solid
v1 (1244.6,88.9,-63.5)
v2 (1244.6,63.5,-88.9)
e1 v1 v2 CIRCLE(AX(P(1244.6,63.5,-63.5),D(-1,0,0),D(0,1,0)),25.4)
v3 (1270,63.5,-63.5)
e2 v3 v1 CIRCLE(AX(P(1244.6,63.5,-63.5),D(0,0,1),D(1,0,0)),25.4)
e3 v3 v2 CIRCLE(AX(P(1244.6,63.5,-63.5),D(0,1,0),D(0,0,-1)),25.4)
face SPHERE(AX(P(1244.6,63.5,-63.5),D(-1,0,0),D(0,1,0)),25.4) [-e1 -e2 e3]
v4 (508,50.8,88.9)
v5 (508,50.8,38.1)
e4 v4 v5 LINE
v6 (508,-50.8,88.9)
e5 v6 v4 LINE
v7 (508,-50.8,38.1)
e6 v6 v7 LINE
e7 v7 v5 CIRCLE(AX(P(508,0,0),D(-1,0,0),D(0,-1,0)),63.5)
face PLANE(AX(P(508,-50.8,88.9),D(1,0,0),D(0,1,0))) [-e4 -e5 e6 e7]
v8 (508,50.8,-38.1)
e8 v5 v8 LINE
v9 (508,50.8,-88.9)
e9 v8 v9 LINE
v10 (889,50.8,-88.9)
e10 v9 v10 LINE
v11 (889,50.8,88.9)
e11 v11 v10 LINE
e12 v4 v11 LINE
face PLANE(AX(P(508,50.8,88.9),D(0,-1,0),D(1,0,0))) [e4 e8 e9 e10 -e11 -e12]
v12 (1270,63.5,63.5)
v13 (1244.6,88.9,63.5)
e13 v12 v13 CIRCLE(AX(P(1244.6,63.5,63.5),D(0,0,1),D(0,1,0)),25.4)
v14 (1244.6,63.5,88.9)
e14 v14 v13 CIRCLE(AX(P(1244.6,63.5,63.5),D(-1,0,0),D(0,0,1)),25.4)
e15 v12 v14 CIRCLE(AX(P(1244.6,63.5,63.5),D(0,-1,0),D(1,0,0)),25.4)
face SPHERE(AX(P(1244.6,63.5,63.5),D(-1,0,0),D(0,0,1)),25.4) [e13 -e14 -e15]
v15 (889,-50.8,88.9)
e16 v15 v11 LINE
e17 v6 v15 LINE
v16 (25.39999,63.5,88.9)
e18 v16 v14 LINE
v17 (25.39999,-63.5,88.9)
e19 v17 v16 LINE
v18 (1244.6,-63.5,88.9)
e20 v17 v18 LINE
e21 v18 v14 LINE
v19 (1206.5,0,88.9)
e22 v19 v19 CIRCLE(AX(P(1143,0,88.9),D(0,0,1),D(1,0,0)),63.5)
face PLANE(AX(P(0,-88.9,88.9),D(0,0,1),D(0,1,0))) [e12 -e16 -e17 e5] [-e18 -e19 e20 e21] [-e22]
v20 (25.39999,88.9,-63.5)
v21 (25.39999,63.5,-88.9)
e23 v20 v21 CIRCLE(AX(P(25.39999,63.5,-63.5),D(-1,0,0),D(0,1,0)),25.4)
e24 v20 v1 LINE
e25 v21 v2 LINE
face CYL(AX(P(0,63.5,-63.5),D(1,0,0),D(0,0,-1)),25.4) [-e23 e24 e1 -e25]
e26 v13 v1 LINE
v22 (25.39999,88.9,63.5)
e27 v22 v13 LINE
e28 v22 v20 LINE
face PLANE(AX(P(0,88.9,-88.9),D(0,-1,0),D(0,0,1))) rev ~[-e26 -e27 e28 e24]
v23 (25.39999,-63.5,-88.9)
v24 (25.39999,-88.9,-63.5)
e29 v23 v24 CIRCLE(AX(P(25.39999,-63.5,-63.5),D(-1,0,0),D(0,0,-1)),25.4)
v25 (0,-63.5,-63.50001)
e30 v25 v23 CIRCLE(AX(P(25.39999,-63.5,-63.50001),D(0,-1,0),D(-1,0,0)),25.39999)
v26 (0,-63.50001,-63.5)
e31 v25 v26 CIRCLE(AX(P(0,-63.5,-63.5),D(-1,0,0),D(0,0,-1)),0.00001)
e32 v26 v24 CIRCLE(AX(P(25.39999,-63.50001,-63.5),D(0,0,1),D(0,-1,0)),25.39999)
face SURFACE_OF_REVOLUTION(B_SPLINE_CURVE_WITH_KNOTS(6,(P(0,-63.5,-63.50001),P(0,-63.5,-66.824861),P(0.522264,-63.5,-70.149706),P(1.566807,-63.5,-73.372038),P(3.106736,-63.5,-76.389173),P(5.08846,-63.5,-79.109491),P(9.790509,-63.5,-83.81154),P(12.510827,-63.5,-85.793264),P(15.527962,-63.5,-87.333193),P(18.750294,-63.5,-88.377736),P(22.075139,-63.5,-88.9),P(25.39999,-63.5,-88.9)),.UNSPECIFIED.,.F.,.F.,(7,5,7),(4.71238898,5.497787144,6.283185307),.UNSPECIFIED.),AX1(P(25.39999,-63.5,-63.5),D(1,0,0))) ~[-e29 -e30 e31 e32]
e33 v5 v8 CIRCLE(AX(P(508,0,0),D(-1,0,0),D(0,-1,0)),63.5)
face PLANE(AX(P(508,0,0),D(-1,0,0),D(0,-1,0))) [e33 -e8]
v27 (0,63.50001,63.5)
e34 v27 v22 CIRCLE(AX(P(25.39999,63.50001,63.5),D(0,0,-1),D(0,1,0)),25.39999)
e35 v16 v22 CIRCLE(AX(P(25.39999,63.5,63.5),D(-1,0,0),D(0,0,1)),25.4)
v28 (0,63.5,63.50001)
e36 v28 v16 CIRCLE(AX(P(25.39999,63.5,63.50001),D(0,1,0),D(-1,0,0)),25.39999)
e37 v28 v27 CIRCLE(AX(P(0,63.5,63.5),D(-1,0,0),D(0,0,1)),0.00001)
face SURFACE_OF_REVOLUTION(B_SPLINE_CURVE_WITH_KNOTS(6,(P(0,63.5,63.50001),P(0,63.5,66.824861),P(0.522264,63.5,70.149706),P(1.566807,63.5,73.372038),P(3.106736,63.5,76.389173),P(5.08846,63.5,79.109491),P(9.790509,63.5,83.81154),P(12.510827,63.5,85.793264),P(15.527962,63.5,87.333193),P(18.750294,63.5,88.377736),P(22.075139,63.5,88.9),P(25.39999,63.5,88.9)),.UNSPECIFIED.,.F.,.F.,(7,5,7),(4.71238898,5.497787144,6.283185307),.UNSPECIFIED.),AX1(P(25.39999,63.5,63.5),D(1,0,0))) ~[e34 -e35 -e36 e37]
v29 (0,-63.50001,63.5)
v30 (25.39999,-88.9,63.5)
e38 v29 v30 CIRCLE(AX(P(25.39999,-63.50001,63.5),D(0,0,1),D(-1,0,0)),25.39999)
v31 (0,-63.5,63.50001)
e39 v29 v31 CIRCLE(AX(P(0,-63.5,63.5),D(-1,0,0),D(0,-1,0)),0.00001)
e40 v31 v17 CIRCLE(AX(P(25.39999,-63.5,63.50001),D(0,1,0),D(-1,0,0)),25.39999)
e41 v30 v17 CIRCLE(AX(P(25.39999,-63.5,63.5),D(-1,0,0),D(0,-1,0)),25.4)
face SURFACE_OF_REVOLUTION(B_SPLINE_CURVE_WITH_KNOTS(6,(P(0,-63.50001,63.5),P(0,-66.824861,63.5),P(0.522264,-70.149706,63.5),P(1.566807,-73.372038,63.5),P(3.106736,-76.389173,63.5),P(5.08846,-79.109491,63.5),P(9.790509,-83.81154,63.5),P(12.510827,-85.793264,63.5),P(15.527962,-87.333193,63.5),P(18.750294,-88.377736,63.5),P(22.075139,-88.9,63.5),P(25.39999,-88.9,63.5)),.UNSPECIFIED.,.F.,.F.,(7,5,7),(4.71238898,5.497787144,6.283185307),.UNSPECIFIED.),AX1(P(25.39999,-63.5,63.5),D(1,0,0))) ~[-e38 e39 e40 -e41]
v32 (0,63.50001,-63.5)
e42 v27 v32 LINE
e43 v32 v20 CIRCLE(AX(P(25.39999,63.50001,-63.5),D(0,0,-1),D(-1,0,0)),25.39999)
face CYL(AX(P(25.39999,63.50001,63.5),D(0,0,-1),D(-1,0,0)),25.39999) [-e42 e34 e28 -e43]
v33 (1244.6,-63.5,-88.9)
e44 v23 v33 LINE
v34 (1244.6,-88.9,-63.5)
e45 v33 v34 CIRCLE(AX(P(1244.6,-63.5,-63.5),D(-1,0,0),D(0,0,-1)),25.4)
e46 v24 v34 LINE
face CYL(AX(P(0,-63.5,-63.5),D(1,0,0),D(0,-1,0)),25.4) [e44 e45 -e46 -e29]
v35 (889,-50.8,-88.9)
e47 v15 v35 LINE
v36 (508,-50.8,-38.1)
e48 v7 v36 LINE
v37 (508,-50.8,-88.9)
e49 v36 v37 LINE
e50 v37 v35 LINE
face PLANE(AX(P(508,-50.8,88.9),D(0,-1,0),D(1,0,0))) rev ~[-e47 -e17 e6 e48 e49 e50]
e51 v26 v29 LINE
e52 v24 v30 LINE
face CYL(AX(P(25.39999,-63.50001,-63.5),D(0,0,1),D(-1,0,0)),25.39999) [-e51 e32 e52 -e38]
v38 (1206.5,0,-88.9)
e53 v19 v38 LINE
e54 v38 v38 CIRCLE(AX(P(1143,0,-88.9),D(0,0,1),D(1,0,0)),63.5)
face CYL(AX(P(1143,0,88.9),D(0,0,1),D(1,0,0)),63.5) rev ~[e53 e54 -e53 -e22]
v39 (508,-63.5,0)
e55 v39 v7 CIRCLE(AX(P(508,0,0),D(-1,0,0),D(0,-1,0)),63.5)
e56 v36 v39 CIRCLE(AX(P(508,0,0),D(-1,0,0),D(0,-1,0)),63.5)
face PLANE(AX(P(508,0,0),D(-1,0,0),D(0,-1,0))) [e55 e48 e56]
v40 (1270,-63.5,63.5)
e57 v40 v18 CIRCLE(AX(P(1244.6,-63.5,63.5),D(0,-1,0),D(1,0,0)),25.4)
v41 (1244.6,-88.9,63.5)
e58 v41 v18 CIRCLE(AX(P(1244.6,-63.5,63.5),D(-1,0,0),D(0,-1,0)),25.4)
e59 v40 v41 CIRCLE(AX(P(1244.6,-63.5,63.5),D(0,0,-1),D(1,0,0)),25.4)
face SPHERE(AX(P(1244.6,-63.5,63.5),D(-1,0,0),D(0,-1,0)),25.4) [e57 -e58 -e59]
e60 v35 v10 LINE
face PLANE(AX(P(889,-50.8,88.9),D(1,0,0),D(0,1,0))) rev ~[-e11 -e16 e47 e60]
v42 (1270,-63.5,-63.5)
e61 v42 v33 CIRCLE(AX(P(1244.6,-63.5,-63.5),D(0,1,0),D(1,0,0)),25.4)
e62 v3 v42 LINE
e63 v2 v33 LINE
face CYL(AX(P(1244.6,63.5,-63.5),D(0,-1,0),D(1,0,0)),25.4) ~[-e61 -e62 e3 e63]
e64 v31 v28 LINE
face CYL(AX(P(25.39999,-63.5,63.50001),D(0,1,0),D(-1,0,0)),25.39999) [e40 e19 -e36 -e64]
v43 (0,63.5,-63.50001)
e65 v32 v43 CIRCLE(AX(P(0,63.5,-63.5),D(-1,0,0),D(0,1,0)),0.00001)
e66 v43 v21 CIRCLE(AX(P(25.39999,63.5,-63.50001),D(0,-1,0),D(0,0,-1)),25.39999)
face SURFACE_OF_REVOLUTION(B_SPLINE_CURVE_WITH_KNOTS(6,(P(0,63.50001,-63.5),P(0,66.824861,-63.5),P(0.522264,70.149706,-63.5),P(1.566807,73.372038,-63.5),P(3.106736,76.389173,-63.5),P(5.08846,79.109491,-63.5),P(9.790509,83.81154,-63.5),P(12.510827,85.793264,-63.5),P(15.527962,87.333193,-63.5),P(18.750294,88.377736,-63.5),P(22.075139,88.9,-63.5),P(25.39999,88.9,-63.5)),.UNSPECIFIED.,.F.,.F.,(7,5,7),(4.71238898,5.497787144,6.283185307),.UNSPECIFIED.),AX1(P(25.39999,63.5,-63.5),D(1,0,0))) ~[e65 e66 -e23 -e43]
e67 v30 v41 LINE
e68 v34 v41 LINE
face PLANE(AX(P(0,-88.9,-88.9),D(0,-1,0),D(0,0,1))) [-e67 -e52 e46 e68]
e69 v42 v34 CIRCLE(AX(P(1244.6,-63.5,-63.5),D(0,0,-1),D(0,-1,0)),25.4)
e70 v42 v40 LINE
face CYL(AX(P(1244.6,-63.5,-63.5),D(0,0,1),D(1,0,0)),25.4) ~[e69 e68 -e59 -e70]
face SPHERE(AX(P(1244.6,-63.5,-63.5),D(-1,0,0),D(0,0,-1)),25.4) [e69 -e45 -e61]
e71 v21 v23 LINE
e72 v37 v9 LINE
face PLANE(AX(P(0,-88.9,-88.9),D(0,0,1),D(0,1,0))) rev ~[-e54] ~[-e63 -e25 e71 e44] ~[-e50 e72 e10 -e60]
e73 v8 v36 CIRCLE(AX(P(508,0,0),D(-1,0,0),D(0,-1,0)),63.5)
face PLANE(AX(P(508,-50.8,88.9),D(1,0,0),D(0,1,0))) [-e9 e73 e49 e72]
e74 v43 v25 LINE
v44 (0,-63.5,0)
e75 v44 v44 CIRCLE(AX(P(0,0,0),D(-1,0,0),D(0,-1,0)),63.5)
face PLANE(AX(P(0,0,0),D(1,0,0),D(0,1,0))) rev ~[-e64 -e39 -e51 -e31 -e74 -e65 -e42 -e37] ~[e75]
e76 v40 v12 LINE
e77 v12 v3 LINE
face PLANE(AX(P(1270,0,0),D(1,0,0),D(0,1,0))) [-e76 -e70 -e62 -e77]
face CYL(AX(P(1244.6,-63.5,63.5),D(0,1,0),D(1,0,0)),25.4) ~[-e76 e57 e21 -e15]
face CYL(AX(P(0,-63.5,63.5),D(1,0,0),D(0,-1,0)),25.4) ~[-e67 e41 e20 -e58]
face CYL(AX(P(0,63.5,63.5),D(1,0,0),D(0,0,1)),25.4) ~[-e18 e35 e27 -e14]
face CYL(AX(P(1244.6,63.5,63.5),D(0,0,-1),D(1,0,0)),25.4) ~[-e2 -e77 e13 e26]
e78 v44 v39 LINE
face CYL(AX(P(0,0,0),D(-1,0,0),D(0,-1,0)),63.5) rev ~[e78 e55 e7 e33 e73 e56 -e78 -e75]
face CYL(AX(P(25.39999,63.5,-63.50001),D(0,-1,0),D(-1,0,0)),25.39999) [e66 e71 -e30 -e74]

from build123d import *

# Parameters (mm, degrees)
F0_W     = 177.8
F0_H     = 177.8
F1_DEPTH = 1270
F2_R     = 63.5
F3_DEPTH = 177.8
F4_R     = 63.5
F5_DEPTH = 508
F6_R     = 25.4
F7_R     = 25.4
F8_W     = 381
F8_H     = 101.6
F9_DEPTH = 177.8
F10_R    = 25.39999


# Not quite as in the source:
# - a fillet or chamfer is up to 0.001 mm smaller than in the source, because OpenCascade refuses the exact size


with BuildPart() as f1:
    # F0 (on Right) → F1 (new body)
    with BuildSketch(Plane.YZ):
        Rectangle(F0_W, F0_H)
    extrude(amount=F1_DEPTH)

    # F2 (on face) → F3 (cut)
    with BuildSketch(Plane.XY.offset(88.9)):
        with Locations((1143, 0)):
            Circle(F2_R)
    extrude(amount=-F3_DEPTH, mode=Mode.SUBTRACT)

    # F4 (on face) → F5 (cut)
    with BuildSketch(Plane(origin=(0, 0, 0), x_dir=(0, -1, 0), z_dir=(-1, 0, 0))):
        Circle(F4_R)
    extrude(amount=-F5_DEPTH, mode=Mode.SUBTRACT)

    # F6
    f6_edges = [f1.edges().sort_by_distance(p)[0] for p in [
        (635, -88.9, 88.9),
        (635, 88.9, 88.9),
        (635, -88.9, -88.9),
        (635, 88.9, -88.9),
    ]]
    fillet(f6_edges, radius=F6_R)

    # F7
    f7_edges = [f1.edges().sort_by_distance(p)[0] for p in [
        (1270, 0, 88.9),
    ]]
    fillet(f7_edges, radius=F7_R)

    # F8 (on face) → F9 (cut)
    with BuildSketch(Plane.XY.offset(88.9)):
        with Locations((698.5, 0)):
            Rectangle(F8_W, F8_H)
    extrude(amount=-F9_DEPTH, mode=Mode.SUBTRACT)

    # F10 (radius 25.4 in the source; OpenCascade refuses exactly that, so slightly less here)
    f10_edges = [f1.edges().sort_by_distance(p)[0] for p in [
        (0, 0, 88.9),
    ]]
    fillet(f10_edges, radius=F10_R)


solid = f1.part
